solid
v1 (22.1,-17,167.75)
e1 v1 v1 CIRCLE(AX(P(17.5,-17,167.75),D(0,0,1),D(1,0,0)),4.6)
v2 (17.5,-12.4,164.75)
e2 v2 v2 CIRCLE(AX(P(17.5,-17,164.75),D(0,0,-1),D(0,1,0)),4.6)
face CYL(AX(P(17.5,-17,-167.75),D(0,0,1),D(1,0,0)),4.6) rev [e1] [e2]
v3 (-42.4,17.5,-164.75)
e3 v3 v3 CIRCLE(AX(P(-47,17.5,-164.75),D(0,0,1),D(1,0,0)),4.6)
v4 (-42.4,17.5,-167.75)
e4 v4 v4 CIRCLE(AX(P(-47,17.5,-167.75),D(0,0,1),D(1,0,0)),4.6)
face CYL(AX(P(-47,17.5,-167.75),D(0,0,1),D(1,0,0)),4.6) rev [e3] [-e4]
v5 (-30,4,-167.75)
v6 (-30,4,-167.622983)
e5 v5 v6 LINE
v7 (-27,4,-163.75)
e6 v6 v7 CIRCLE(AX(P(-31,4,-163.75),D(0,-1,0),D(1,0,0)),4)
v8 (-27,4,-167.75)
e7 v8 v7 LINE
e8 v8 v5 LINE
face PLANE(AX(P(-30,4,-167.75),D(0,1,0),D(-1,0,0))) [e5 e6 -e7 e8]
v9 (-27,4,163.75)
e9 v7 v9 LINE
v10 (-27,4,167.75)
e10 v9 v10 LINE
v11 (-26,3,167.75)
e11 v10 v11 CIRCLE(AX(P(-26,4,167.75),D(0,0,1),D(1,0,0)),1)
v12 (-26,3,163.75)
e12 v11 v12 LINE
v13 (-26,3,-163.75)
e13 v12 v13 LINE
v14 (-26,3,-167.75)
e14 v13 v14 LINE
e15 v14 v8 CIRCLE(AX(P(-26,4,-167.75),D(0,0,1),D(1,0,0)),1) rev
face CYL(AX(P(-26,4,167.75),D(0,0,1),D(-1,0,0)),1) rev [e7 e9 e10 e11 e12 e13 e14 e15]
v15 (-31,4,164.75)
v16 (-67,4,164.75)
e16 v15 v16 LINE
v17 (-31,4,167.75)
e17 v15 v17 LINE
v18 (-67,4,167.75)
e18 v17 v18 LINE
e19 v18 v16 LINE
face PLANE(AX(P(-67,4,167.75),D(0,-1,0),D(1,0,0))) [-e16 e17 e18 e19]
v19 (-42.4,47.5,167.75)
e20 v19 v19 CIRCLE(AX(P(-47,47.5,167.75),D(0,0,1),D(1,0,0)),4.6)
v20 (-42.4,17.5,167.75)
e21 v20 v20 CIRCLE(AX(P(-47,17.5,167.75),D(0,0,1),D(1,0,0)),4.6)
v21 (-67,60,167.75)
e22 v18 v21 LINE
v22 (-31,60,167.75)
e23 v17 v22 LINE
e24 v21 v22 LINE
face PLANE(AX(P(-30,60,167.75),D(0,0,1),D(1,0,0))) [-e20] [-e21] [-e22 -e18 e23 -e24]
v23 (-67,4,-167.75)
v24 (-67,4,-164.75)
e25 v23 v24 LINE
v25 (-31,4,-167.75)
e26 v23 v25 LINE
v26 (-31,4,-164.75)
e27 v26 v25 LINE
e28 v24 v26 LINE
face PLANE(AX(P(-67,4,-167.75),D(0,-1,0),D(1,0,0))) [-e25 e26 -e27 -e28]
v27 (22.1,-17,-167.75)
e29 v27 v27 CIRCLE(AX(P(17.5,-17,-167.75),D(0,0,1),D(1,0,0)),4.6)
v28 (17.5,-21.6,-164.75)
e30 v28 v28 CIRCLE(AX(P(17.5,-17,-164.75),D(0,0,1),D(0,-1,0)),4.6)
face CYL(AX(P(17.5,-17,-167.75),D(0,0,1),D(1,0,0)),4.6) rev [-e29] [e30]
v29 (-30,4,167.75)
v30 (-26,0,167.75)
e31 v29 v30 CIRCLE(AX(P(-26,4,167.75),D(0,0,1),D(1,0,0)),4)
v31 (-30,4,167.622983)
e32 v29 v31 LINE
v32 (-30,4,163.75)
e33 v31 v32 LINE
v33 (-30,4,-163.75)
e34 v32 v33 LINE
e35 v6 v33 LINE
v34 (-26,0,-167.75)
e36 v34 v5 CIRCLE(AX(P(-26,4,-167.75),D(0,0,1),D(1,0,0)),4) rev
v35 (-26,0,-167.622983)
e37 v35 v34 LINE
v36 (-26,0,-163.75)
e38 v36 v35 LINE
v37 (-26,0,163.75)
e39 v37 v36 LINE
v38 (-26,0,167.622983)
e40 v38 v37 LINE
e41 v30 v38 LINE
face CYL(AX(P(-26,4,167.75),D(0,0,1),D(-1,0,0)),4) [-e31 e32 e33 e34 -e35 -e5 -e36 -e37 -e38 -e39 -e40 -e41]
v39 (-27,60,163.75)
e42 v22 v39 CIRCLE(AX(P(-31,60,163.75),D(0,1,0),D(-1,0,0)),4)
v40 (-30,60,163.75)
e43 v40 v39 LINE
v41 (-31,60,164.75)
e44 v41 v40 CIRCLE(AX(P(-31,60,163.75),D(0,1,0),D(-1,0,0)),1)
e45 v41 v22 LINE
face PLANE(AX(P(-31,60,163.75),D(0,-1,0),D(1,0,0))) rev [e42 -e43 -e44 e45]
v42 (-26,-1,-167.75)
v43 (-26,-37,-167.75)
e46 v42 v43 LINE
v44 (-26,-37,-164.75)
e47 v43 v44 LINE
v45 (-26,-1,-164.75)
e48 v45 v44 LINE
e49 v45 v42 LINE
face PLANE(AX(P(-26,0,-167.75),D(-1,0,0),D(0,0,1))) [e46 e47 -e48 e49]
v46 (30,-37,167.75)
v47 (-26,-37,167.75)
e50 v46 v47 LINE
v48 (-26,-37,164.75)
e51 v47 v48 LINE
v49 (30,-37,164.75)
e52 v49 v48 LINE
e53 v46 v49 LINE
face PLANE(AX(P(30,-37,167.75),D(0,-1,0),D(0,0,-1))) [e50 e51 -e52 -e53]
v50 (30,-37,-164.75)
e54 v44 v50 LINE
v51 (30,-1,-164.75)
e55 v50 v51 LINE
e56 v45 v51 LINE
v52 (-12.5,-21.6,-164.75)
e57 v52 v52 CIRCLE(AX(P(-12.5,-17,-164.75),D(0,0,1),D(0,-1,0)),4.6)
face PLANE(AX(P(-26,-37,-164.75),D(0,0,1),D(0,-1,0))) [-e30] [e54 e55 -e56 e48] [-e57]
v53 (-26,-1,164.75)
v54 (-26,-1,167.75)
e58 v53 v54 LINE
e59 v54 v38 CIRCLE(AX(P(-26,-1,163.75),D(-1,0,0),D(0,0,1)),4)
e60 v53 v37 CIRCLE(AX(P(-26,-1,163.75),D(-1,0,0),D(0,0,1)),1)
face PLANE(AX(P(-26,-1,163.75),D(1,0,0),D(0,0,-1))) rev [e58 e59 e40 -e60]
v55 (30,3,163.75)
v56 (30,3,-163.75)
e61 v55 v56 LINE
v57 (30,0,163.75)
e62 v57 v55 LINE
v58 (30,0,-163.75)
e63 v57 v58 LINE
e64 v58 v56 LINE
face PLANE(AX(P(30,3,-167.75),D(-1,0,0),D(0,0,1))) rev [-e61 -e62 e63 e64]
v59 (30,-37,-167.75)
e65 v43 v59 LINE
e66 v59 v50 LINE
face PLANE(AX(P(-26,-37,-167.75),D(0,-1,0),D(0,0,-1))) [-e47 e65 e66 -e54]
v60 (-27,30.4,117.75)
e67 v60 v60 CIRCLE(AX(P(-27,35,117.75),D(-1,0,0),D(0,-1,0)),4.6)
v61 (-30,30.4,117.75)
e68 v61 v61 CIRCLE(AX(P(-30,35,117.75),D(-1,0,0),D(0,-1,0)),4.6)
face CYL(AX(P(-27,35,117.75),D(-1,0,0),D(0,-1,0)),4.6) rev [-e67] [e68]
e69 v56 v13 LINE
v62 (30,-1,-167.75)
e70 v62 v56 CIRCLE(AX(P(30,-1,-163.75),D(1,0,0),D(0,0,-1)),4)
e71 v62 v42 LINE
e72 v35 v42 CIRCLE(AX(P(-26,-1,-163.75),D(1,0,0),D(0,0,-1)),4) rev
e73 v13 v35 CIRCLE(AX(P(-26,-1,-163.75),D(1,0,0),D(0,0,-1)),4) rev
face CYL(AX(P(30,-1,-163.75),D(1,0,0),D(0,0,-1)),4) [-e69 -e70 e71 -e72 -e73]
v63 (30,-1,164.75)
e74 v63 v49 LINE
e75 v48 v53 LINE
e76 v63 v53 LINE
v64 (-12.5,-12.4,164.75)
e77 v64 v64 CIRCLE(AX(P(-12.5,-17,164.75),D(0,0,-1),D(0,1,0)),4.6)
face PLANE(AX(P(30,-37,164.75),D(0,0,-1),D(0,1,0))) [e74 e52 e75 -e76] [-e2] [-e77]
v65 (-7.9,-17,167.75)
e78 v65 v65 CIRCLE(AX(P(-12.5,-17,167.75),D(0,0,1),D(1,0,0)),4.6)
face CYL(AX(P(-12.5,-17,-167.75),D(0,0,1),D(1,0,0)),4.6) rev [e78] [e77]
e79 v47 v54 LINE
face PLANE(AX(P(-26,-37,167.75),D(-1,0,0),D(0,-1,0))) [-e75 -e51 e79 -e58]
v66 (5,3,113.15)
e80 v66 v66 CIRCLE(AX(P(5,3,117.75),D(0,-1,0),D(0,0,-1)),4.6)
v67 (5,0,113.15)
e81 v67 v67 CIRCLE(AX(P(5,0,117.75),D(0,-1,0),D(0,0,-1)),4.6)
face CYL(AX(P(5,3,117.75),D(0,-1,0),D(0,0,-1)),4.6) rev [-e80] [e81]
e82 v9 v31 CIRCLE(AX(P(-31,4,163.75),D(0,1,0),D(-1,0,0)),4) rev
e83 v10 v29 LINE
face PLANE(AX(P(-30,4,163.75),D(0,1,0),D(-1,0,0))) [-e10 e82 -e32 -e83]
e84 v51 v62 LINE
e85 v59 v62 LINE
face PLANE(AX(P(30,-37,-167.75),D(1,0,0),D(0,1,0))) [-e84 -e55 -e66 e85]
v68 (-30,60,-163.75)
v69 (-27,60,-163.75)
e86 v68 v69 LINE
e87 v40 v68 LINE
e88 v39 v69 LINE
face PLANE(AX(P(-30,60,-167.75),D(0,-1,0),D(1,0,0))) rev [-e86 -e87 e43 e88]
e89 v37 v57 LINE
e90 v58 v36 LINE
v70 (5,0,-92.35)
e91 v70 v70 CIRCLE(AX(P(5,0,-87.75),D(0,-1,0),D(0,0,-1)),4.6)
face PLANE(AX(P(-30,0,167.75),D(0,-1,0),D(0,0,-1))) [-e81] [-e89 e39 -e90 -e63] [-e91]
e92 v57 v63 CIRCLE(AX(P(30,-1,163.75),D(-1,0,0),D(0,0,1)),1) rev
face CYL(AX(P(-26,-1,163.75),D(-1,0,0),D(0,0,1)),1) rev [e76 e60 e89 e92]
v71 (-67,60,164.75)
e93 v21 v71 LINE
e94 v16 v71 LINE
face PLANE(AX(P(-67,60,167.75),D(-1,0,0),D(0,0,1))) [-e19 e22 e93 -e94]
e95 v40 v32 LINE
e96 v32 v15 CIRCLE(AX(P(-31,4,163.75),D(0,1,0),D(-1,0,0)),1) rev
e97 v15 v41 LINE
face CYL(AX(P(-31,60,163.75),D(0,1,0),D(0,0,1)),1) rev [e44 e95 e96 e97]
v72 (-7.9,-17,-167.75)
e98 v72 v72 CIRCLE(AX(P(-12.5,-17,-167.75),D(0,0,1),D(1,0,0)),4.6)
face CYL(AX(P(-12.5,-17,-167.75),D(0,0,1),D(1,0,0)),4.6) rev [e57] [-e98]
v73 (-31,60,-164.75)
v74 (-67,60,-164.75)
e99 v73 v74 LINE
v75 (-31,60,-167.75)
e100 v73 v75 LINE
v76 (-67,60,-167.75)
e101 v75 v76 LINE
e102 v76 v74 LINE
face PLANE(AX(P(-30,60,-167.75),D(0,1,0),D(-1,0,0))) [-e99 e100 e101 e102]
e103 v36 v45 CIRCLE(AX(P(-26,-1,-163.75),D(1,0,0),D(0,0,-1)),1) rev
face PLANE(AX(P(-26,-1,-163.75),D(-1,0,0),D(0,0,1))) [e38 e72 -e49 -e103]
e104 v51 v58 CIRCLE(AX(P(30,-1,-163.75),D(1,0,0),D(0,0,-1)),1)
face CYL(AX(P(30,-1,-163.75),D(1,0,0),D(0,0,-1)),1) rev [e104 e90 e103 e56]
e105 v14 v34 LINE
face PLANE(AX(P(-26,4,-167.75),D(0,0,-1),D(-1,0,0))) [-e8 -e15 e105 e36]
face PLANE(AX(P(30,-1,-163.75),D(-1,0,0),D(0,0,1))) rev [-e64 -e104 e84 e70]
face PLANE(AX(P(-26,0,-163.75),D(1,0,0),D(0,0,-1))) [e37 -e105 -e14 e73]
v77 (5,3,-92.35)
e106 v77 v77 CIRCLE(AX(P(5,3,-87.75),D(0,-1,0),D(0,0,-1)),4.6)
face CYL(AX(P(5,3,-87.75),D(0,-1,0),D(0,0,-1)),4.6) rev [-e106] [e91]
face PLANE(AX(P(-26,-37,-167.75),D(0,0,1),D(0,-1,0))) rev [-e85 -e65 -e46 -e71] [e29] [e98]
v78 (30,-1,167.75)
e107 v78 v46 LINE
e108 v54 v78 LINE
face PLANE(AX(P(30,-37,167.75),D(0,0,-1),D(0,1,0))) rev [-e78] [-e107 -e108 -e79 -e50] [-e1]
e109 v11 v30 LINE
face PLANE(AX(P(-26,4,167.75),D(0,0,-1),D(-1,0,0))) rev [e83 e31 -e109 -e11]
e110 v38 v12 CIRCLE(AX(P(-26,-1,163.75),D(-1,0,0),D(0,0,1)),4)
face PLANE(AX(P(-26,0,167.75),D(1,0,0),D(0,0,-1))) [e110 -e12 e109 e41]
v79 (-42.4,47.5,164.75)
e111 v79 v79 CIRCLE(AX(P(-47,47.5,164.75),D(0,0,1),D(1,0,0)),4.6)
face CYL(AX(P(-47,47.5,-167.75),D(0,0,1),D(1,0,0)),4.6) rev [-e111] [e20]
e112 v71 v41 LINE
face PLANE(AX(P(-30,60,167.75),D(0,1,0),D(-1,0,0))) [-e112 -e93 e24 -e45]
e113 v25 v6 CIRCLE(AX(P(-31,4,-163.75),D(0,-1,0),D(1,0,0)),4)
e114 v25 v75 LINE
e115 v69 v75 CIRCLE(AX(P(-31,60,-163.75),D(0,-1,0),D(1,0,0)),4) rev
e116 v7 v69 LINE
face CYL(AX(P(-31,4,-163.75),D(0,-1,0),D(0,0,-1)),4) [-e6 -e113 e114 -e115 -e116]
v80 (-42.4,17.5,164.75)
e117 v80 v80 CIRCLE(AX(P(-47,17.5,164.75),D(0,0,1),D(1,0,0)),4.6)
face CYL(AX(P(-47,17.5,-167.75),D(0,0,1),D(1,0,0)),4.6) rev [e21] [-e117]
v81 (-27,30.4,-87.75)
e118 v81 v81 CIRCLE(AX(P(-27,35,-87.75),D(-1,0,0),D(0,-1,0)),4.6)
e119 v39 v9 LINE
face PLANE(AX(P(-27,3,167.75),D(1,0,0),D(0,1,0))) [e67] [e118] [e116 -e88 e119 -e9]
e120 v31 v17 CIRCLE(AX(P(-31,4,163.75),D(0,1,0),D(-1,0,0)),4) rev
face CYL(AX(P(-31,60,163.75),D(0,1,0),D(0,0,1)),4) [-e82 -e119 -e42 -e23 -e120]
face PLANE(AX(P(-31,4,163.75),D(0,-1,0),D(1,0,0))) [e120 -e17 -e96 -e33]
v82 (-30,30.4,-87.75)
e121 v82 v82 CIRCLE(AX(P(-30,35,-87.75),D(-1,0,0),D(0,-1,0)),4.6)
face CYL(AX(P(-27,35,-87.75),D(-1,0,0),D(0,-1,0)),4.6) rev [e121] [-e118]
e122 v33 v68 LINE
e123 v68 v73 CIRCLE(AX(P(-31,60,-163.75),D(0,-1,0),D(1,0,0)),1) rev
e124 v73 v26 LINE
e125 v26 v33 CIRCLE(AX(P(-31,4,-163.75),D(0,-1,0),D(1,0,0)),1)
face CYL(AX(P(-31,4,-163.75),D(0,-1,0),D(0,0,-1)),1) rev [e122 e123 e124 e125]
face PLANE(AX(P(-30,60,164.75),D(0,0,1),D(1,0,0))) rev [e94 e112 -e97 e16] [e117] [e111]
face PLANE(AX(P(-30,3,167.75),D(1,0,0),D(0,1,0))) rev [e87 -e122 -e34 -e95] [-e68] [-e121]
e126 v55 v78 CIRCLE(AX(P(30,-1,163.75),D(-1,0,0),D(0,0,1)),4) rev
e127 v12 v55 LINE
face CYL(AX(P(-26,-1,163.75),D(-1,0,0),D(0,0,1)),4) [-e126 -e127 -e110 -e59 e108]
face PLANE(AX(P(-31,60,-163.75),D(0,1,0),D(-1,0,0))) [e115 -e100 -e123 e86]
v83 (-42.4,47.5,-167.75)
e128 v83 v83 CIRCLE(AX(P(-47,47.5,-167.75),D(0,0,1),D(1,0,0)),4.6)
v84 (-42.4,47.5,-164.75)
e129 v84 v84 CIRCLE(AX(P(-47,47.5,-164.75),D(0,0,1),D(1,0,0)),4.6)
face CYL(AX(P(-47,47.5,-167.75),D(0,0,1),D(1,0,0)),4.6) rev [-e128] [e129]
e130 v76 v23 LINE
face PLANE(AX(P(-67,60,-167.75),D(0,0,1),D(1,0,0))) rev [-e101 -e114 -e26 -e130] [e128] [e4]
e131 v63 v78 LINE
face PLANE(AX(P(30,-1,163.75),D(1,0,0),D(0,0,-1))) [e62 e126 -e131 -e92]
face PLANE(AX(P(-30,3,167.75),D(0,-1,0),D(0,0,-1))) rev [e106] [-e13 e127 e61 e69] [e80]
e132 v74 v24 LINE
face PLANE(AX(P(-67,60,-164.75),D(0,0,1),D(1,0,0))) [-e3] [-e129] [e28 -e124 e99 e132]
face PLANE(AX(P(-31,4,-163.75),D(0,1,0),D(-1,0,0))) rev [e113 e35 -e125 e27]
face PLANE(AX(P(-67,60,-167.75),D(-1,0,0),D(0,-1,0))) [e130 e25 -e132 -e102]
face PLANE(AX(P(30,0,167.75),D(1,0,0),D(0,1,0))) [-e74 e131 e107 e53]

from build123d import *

# Parameters (mm, degrees)
SKETCH1_W                      = 60
SKETCH1_H                      = 335.5
BASE_FLANGE1_DEPTH             = 3
EDGE_FLANGE1_STRIP_W           = 14
EDGE_FLANGE1_STRIP_H           = 3
EDGE_FLANGE1_STRIP_CUT_DEPTH   = 335.5
EDGE_FLANGE1_DEPTH             = 335.5
EDGE_FLANGE2_STRIP_W           = 14
EDGE_FLANGE2_STRIP_H           = 3
EDGE_FLANGE2_STRIP_CUT_DEPTH   = 56
EDGE_FLANGE2_STRIP_2_W         = 14
EDGE_FLANGE2_STRIP_2_H         = 3
EDGE_FLANGE2_STRIP_CUT_2_DEPTH = 56
EDGE_FLANGE2_STRIP_3_W         = 14
EDGE_FLANGE2_STRIP_3_H         = 3
EDGE_FLANGE2_STRIP_CUT_3_DEPTH = 56
EDGE_FLANGE2_STRIP_4_W         = 14
EDGE_FLANGE2_STRIP_4_H         = 3
EDGE_FLANGE2_STRIP_CUT_4_DEPTH = 56
EDGE_FLANGE2_DEPTH             = 56
EDGE_FLANGE2_BEND_DEPTH        = 56
EDGE_FLANGE2_BEND_2_DEPTH      = 56
EDGE_FLANGE2_BEND_3_DEPTH      = 56
SKETCH18_R                     = 4.6
EXTRUDE1_DEPTH                 = 348.346009046
SKETCH21_R                     = 4.6
CUT_EXTRUDE1_DEPTH             = 10
SKETCH22_R                     = 4.6
CUT_EXTRUDE2_DEPTH             = 10


# Sheet-metal steps are written as plain solids
with BuildPart() as part:
    # Sketch1 → Base-Flange1 (new body)
    with BuildSketch(Plane(origin=(0, 0, 0), x_dir=(1, 0, 0), z_dir=(0, 1, 0))):
        Rectangle(SKETCH1_W, SKETCH1_H)
    extrude(amount=BASE_FLANGE1_DEPTH)

    # Edge-Flange1 strip (across the edge) → Edge-Flange1 strip cut (cut)
    with BuildSketch(Plane(origin=(-30, 3, -167.75), x_dir=(1, 0, 0), z_dir=(0, 0, 1))):
        with Locations((-3, -1.5)):
            Rectangle(EDGE_FLANGE1_STRIP_W, EDGE_FLANGE1_STRIP_H)
    extrude(amount=EDGE_FLANGE1_STRIP_CUT_DEPTH, mode=Mode.SUBTRACT)

    # Edge-Flange1 section (across the edge) → Edge-Flange1 (add)
    with BuildSketch(Plane(origin=(-30, 3, -167.75), x_dir=(1, 0, 0), z_dir=(0, 0, 1))):
        with BuildLine():
            Line((0, 1), (0, 57))
            Line((0, 57), (3, 57))
            Line((3, 57), (3, 1))
            ThreePointArc((3, 1), (3.292893219, 0.292893219), (4, 0))
            Line((4, 0), (4, -3))
            ThreePointArc((4, -3), (1.171572875, -1.828427125), (0, 1))
        make_face()
    extrude(amount=EDGE_FLANGE1_DEPTH)

    # Edge-Flange2 strip (across the edge) → Edge-Flange2 strip cut (cut)
    with BuildSketch(Plane(origin=(-30, 4, 167.75), x_dir=(0, 0, -1), z_dir=(0, 1, 0))):
        with Locations((-3, -1.5)):
            Rectangle(EDGE_FLANGE2_STRIP_W, EDGE_FLANGE2_STRIP_H)
    extrude(amount=EDGE_FLANGE2_STRIP_CUT_DEPTH, mode=Mode.SUBTRACT)

    # Edge-Flange2 strip 2 (across the edge) → Edge-Flange2 strip cut 2 (cut)
    with BuildSketch(Plane(origin=(30, 0, 167.75), x_dir=(0, 0, -1), z_dir=(-1, 0, 0))):
        with Locations((-3, -1.5)):
            Rectangle(EDGE_FLANGE2_STRIP_2_W, EDGE_FLANGE2_STRIP_2_H)
    extrude(amount=EDGE_FLANGE2_STRIP_CUT_2_DEPTH, mode=Mode.SUBTRACT)

    # Edge-Flange2 strip 3 (across the edge) → Edge-Flange2 strip cut 3 (cut)
    with BuildSketch(Plane(origin=(-30, 60, -167.75), x_dir=(0, 0, 1), z_dir=(0, -1, 0))):
        with Locations((-3, -1.5)):
            Rectangle(EDGE_FLANGE2_STRIP_3_W, EDGE_FLANGE2_STRIP_3_H)
    extrude(amount=EDGE_FLANGE2_STRIP_CUT_3_DEPTH, mode=Mode.SUBTRACT)

    # Edge-Flange2 strip 4 (across the edge) → Edge-Flange2 strip cut 4 (cut)
    with BuildSketch(Plane(origin=(-26, 0, -167.75), x_dir=(0, 0, 1), z_dir=(1, 0, 0))):
        with Locations((-3, -1.5)):
            Rectangle(EDGE_FLANGE2_STRIP_4_W, EDGE_FLANGE2_STRIP_4_H)
    extrude(amount=EDGE_FLANGE2_STRIP_CUT_4_DEPTH, mode=Mode.SUBTRACT)

    # Edge-Flange2 section (across the edge) → Edge-Flange2 (add)
    with BuildSketch(Plane(origin=(-30, 4, 167.75), x_dir=(0, 0, -1), z_dir=(0, 1, 0))):
        with BuildLine():
            Line((0, 1), (0, 37))
            Line((0, 37), (3, 37))
            Line((3, 37), (3, 1))
            ThreePointArc((3, 1), (3.292893219, 0.292893219), (4, 0))
            Line((4, 0), (4, -3))
            ThreePointArc((4, -3), (1.171572875, -1.828427125), (0, 1))
        make_face()
    extrude(amount=EDGE_FLANGE2_DEPTH)

    # Edge-Flange2 section 2 (across the edge) → Edge-Flange2 bend (add)
    with BuildSketch(Plane(origin=(30, 0, 167.75), x_dir=(0, 0, -1), z_dir=(-1, 0, 0))):
        with BuildLine():
            Line((0, 1), (0, 37))
            Line((0, 37), (3, 37))
            Line((3, 37), (3, 1))
            ThreePointArc((3, 1), (3.292893219, 0.292893219), (4, 0))
            Line((4, 0), (4, -3))
            ThreePointArc((4, -3), (1.171572875, -1.828427125), (0, 1))
        make_face()
    extrude(amount=EDGE_FLANGE2_BEND_DEPTH)

    # Edge-Flange2 section 3 (across the edge) → Edge-Flange2 bend 2 (add)
    with BuildSketch(Plane(origin=(-30, 60, -167.75), x_dir=(0, 0, 1), z_dir=(0, -1, 0))):
        with BuildLine():
            Line((0, 1), (0, 37))
            Line((0, 37), (3, 37))
            Line((3, 37), (3, 1))
            ThreePointArc((3, 1), (3.292893219, 0.292893219), (4, 0))
            Line((4, 0), (4, -3))
            ThreePointArc((4, -3), (1.171572875, -1.828427125), (0, 1))
        make_face()
    extrude(amount=EDGE_FLANGE2_BEND_2_DEPTH)

    # Edge-Flange2 section 4 (across the edge) → Edge-Flange2 bend 3 (add)
    with BuildSketch(Plane(origin=(-26, 0, -167.75), x_dir=(0, 0, 1), z_dir=(1, 0, 0))):
        with BuildLine():
            Line((0, 1), (0, 37))
            Line((0, 37), (3, 37))
            Line((3, 37), (3, 1))
            ThreePointArc((3, 1), (3.292893219, 0.292893219), (4, 0))
            Line((4, 0), (4, -3))
            ThreePointArc((4, -3), (1.171572875, -1.828427125), (0, 1))
        make_face()
    extrude(amount=EDGE_FLANGE2_BEND_3_DEPTH)

    # Sketch18 → Extrude1 (cut, through all)
    with BuildSketch(Plane.XY.offset(167.75)):
        with Locations((-47, 47.5)):
            Circle(SKETCH18_R)
        with Locations((-47, 17.5)):
            Circle(SKETCH18_R)
        with Locations((-12.5, -17)):
            Circle(SKETCH18_R)
        with Locations((17.5, -17)):
            Circle(SKETCH18_R)
    extrude(amount=-EXTRUDE1_DEPTH, mode=Mode.SUBTRACT)

    # Sketch21 → Cut-Extrude1 (cut)
    with BuildSketch(Plane.XZ):
        with Locations(Location((5, -87.75, 0), (0, 0, 270))):
            Circle(SKETCH21_R)
        with Locations(Location((5, 117.75, 0), (0, 0, 270))):
            Circle(SKETCH21_R)
    extrude(amount=-CUT_EXTRUDE1_DEPTH, mode=Mode.SUBTRACT)

    # Sketch22 → Cut-Extrude2 (cut)
    with BuildSketch(Plane.ZY.offset(30)):
        with Locations(Location((-87.75, 35, 0), (0, 0, 270))):
            Circle(SKETCH22_R)
        with Locations(Location((117.75, 35, 0), (0, 0, 270))):
            Circle(SKETCH22_R)
    extrude(amount=-CUT_EXTRUDE2_DEPTH, mode=Mode.SUBTRACT)


solid = part.part
